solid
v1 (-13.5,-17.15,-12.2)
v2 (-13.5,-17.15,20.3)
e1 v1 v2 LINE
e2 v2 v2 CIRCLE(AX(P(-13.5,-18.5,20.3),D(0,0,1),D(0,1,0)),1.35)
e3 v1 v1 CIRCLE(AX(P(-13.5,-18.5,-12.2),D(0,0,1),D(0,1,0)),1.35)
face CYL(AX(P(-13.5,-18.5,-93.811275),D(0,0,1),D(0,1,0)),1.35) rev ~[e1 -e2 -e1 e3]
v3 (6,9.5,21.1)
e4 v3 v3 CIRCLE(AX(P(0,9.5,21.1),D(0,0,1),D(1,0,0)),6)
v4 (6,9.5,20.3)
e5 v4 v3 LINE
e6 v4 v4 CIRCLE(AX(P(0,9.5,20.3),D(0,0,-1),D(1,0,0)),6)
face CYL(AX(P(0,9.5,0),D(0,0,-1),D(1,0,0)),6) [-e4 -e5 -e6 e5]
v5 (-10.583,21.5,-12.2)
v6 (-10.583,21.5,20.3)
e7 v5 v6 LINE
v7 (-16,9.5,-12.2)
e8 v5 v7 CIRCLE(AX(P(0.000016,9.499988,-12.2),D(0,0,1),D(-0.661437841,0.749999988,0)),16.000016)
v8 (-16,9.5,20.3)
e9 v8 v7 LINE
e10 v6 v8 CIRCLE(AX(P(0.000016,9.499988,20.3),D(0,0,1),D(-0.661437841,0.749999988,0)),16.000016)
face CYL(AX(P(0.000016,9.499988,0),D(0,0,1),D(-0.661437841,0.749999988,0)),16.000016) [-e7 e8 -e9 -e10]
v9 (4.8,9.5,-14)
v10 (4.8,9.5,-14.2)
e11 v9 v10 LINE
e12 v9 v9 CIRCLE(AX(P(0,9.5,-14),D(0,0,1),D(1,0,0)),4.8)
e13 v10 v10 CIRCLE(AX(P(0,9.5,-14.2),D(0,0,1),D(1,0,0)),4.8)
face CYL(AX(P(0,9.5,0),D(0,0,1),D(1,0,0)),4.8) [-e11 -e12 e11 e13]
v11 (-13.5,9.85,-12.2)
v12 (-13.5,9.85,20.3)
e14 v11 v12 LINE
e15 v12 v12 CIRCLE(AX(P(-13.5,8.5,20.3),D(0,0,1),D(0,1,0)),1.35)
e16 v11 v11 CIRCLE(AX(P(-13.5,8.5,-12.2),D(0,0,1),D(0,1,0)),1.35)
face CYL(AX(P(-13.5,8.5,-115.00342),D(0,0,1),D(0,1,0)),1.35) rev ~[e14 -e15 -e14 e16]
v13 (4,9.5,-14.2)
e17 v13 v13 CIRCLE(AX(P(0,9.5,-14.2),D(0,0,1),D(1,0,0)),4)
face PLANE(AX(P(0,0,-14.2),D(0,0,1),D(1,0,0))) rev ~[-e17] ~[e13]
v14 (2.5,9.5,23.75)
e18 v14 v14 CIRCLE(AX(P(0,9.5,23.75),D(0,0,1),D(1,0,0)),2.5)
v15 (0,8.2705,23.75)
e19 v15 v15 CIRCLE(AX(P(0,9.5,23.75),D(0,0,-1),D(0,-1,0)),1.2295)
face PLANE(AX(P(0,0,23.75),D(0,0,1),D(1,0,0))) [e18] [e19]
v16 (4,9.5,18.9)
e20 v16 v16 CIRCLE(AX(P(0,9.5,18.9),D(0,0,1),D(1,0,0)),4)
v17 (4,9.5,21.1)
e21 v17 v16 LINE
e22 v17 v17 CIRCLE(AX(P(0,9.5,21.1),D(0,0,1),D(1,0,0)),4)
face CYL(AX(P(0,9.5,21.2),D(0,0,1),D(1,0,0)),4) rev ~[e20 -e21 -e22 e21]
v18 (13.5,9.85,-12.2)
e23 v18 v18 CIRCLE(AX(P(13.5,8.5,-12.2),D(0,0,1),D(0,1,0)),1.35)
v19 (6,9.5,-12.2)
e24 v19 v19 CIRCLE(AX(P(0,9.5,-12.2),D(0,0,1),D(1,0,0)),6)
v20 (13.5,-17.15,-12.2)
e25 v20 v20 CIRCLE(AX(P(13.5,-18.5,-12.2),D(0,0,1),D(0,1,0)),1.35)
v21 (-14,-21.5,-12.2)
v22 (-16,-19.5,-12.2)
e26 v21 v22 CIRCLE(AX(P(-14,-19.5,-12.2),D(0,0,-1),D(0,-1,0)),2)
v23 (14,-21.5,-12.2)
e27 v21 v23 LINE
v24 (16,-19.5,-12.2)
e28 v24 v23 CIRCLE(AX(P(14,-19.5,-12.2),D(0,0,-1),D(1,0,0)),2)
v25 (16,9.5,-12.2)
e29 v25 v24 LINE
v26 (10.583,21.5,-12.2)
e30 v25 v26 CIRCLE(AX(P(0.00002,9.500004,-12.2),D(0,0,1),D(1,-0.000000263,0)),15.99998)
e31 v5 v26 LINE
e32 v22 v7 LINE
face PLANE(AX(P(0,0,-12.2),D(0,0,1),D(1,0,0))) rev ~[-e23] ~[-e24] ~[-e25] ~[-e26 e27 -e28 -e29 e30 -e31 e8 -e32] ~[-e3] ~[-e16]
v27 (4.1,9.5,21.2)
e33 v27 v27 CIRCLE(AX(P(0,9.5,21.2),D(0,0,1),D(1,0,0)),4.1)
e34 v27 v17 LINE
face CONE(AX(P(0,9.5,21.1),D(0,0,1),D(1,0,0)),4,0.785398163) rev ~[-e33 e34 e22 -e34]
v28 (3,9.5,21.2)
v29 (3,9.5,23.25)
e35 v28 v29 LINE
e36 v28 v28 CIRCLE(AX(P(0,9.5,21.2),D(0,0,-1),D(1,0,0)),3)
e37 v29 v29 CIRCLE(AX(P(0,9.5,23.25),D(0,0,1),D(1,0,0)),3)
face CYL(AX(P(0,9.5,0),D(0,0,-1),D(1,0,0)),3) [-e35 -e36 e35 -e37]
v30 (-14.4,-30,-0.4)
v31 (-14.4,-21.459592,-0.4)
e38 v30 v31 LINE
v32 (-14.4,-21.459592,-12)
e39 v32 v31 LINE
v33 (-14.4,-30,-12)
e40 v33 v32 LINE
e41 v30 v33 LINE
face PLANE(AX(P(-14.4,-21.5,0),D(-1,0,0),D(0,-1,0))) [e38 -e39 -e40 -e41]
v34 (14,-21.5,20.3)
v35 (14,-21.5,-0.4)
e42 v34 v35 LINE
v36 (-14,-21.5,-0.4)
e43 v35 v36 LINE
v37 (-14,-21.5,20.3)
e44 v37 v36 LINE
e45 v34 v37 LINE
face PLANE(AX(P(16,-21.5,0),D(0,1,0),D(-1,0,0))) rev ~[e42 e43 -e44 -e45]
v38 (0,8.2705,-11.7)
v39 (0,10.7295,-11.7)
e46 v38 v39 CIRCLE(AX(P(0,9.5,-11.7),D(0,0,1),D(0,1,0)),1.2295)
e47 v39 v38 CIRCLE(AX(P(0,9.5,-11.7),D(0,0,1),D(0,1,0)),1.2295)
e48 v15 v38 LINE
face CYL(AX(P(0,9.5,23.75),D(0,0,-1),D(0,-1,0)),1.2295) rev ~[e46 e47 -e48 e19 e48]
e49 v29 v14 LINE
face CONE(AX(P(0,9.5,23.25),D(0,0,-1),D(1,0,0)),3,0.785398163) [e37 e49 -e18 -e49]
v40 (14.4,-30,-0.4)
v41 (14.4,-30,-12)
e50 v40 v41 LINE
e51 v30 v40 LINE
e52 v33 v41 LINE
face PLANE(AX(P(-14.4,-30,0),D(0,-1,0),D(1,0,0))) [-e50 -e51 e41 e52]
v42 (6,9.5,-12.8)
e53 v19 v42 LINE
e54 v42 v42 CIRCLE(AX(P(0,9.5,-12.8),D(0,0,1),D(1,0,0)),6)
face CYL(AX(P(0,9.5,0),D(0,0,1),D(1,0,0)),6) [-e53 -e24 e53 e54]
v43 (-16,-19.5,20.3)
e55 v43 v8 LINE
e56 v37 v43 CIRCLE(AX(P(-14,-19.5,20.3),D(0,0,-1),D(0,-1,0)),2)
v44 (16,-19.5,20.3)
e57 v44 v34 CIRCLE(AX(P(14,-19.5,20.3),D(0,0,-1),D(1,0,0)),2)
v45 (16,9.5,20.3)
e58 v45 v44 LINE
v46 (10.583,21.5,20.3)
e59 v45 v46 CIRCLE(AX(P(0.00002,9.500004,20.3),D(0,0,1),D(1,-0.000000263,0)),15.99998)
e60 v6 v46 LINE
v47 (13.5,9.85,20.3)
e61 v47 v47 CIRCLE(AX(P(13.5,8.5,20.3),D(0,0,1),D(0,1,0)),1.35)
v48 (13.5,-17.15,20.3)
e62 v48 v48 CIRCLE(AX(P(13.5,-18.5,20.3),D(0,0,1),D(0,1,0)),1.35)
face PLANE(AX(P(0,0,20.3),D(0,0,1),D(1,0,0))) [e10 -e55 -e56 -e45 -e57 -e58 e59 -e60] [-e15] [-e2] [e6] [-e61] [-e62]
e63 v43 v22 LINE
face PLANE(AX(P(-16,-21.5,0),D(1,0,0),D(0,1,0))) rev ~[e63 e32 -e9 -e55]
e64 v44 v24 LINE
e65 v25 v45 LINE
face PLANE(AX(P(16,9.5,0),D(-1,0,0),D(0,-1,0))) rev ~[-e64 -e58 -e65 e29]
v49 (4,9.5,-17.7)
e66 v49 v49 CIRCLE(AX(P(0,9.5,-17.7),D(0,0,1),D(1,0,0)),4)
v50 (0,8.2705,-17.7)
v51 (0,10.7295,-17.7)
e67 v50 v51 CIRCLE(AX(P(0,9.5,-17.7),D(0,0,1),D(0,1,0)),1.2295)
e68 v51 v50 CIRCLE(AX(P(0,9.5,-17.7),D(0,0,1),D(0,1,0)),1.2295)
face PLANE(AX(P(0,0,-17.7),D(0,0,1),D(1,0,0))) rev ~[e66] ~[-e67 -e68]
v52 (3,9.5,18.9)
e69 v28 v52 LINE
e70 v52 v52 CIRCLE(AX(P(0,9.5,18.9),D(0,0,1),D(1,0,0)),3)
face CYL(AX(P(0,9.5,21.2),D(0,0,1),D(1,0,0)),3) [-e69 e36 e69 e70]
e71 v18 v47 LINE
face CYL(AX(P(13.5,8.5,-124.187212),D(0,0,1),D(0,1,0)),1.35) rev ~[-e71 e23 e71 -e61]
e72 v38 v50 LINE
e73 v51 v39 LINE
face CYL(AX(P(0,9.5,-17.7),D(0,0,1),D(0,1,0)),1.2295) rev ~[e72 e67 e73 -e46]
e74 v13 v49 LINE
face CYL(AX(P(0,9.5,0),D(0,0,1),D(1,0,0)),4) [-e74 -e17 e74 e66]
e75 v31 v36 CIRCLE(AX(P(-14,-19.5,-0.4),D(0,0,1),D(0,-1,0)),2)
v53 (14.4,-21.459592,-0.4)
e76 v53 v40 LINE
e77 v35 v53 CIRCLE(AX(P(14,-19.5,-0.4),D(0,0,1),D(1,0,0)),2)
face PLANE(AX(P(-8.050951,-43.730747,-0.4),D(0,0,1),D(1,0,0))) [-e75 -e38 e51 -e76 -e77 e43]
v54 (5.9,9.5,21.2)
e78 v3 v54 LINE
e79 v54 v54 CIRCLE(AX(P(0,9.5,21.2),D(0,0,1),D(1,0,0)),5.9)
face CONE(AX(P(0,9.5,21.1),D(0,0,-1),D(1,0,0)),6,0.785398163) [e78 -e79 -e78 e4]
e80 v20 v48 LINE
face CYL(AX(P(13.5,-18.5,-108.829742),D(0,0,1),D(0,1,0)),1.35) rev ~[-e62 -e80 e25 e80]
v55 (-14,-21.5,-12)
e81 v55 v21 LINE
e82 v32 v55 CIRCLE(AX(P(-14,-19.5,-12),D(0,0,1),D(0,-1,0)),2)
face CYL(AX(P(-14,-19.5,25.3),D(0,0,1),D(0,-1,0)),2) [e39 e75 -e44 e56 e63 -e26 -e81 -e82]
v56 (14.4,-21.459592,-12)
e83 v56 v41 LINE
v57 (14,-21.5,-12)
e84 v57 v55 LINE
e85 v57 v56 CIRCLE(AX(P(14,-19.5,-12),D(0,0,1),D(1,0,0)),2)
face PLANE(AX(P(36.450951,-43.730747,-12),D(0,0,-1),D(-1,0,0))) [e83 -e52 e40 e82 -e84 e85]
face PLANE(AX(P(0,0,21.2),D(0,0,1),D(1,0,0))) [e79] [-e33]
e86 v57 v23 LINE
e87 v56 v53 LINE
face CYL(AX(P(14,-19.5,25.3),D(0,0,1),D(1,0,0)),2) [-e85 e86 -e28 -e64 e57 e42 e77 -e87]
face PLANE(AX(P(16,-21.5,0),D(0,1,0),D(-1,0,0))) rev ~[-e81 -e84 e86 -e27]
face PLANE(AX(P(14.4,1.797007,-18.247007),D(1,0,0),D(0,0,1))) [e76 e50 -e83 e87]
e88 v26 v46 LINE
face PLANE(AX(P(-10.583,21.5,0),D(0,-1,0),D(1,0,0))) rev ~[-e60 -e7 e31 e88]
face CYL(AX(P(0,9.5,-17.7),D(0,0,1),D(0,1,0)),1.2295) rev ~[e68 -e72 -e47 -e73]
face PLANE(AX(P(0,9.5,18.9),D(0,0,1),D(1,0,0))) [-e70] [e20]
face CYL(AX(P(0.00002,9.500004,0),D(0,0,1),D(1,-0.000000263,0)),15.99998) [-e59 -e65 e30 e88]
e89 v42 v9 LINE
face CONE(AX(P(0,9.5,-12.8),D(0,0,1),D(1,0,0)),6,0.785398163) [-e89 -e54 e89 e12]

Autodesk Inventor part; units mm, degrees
ref_plane "YZ Plane" through (0, 0, 0) normal (1, 0, 0) x (0, 1, 0)
ref_plane "XZ Plane" through (0, 0, 0) normal (0, 1, 0) x (-1, 0, 0)
ref_plane "XY Plane" through (0, 0, 0) normal (0, 0, 1) x (1, 0, 0)
sketch "スケッチ1" plane through (0, 0, 0) normal (0, 0, 1) x (1, 0, 0)
  line L0 (-16, 21.5) -> (-10.583, 21.5) construction
  line L1 (16, 21.5) -> (16, 9.5) construction
  line L2 (16, -21.5) -> (-16, -21.5)
  line L3 (-16, -21.5) -> (-16, 9.5)
  line L4 (-16, 21.5) -> (16, -21.5) construction
  line L5 (16, 21.5) -> (-16, -21.5) construction
  line L6 (-14.4, -21.5) -> (-14.4, -30)
  line L7 (-14.4, -30) -> (14.4, -30)
  line L8 (0, 21.5) -> (0, -21.5) construction
  line L9 (14.4, -21.5) -> (14.4, -30)
  line L10 (-13.5, 21.5) -> (-13.5, -21.5) construction
  circle A0 centre (0, 9.5) radius 6
  circle A1 centre (0, 9.5) radius 4
  arc A2 (-10.583, 21.5) -> (-16, 9.5) centre (0, 9.5) ccw
  arc A3 (16, 9.5) -> (10.583, 21.5) centre (0, 9.5) ccw
  line L11 (-10.583, 21.5) -> (10.583, 21.5)
  line L12 (-16, 9.5) -> (-16, 21.5) construction
  line L13 (10.583, 21.5) -> (16, 21.5) construction
  line L14 (16, 9.5) -> (16, -21.5)
  circle A4 centre (0, 9.5) radius 3
  circle A5 centre (0, 9.5) radius 4.8
  point P0 (0, 0)
  point P1 (-13.5, 8.5)
  point P2 (-13.5, -18.5)
  point P3 (13.5, 8.5)
  point P4 (13.5, -18.5)
  dimension "d0" = 32
  dimension "d1" = 43
  dimension "d4" = 28.8
  dimension "d5" = 8.5
  dimension "d8" = 27
  dimension "d9" = 8.5
  dimension "d12" = 18.5
  dimension "d13" = 12
  dimension "d14" = 8
  dimension "d15" = 9.5
  dimension "d17" = 16
  dimension "d32" = 13.5
  dimension "d47" = 6
  dimension "d67" = 9.6
extrude "押し出し1" add sketch "スケッチ1" against normal blind 12.2 contours L2 L3 A2 L11 A3 L14 | A0 | A1 | A4 | A5
extrude "押し出し2" add sketch "スケッチ1" against normal blind 12 contours L9 L7 L6 L2
extrude "押し出し3" add sketch "スケッチ1" against normal blind 14 contours A0 | A1 | A4 | A5
extrude "押し出し4" add sketch "スケッチ1" against normal blind 17.7 contours A1 | A4
chamfer "面取り1" distance 1.2 angle 45 1 edges at (-6, 9.5, -14)
sketch "スケッチ2" plane through (0, 9.5, -17.7) normal (0, 0, -1) x (-1, 0, 0)
  circle A0 centre (0, 0) radius 4 projected
  point P0 (0, -9.5)
hole "穴1" at (0, 9.5, -17.7) direction (0, 0, 1) diameter 2.459 depth 6 thread size "M3x0.5" class "6H" standard "ANSI Metric M Profile"
extrude "押し出し5" add sketch "スケッチ1" along normal blind 20.3 contours L2 L3 A2 L11 A3 L14 | A0 | A1 | A4 | A5
hole "穴2" at (-13.5, 8.5, 0) at (-13.5, -18.5, 0) at (13.5, 8.5, 0) at (13.5, -18.5, 0) direction (0, 0, 1) diameter 2.7 end through all both
extrude "押し出し6" cut sketch "スケッチ1" against normal blind 0.4 contours L9 L7 L6 L2
fillet "フィレット1" radius 2 2 edges at (16, -21.5, 4.05) (-16, -21.5, 4.05)
extrude "押し出し7" add sketch "スケッチ1" along normal blind 21.2 contours A0 | A1 | A4 | A5
extrude "押し出し8" add sketch "スケッチ1" along normal blind 23.75 contours A4
sketch "スケッチ3" plane through (0, 9.5, 23.75) normal (0, 0, 1) x (1, 0, 0)
  circle A0 centre (0, 0) radius 1.2295 projected
  point P0 (0, -9.5)
hole "穴3" at (0, 9.5, 23.75) direction (0, 0, -1) diameter 2.459 end through all thread size "M3x0.5" class "6H" standard "ANSI Metric M Profile"
sketch "スケッチ4" plane through (0, 9.5, 21.2) normal (0, 0, 1) x (1, 0, 0)
  circle A0 centre (0, 0) radius 4
  circle A1 centre (0, 0) radius 3
  point P0 (0, -9.5)
extrude "押し出し9" cut sketch "スケッチ4" against normal blind 2.3
chamfer "面取り2" distance 0.5 angle 45 1 edges at (-3, 9.5, 23.75)
extrude "押し出し10" add sketch "スケッチ1" against normal blind 14.2 contours A5
chamfer "面取り4" distance 0.1 angle 45 2 edges at (-4, 9.5, 21.2) (-6, 9.5, 21.2)
properties part number "B3M-SC-1040-A"
